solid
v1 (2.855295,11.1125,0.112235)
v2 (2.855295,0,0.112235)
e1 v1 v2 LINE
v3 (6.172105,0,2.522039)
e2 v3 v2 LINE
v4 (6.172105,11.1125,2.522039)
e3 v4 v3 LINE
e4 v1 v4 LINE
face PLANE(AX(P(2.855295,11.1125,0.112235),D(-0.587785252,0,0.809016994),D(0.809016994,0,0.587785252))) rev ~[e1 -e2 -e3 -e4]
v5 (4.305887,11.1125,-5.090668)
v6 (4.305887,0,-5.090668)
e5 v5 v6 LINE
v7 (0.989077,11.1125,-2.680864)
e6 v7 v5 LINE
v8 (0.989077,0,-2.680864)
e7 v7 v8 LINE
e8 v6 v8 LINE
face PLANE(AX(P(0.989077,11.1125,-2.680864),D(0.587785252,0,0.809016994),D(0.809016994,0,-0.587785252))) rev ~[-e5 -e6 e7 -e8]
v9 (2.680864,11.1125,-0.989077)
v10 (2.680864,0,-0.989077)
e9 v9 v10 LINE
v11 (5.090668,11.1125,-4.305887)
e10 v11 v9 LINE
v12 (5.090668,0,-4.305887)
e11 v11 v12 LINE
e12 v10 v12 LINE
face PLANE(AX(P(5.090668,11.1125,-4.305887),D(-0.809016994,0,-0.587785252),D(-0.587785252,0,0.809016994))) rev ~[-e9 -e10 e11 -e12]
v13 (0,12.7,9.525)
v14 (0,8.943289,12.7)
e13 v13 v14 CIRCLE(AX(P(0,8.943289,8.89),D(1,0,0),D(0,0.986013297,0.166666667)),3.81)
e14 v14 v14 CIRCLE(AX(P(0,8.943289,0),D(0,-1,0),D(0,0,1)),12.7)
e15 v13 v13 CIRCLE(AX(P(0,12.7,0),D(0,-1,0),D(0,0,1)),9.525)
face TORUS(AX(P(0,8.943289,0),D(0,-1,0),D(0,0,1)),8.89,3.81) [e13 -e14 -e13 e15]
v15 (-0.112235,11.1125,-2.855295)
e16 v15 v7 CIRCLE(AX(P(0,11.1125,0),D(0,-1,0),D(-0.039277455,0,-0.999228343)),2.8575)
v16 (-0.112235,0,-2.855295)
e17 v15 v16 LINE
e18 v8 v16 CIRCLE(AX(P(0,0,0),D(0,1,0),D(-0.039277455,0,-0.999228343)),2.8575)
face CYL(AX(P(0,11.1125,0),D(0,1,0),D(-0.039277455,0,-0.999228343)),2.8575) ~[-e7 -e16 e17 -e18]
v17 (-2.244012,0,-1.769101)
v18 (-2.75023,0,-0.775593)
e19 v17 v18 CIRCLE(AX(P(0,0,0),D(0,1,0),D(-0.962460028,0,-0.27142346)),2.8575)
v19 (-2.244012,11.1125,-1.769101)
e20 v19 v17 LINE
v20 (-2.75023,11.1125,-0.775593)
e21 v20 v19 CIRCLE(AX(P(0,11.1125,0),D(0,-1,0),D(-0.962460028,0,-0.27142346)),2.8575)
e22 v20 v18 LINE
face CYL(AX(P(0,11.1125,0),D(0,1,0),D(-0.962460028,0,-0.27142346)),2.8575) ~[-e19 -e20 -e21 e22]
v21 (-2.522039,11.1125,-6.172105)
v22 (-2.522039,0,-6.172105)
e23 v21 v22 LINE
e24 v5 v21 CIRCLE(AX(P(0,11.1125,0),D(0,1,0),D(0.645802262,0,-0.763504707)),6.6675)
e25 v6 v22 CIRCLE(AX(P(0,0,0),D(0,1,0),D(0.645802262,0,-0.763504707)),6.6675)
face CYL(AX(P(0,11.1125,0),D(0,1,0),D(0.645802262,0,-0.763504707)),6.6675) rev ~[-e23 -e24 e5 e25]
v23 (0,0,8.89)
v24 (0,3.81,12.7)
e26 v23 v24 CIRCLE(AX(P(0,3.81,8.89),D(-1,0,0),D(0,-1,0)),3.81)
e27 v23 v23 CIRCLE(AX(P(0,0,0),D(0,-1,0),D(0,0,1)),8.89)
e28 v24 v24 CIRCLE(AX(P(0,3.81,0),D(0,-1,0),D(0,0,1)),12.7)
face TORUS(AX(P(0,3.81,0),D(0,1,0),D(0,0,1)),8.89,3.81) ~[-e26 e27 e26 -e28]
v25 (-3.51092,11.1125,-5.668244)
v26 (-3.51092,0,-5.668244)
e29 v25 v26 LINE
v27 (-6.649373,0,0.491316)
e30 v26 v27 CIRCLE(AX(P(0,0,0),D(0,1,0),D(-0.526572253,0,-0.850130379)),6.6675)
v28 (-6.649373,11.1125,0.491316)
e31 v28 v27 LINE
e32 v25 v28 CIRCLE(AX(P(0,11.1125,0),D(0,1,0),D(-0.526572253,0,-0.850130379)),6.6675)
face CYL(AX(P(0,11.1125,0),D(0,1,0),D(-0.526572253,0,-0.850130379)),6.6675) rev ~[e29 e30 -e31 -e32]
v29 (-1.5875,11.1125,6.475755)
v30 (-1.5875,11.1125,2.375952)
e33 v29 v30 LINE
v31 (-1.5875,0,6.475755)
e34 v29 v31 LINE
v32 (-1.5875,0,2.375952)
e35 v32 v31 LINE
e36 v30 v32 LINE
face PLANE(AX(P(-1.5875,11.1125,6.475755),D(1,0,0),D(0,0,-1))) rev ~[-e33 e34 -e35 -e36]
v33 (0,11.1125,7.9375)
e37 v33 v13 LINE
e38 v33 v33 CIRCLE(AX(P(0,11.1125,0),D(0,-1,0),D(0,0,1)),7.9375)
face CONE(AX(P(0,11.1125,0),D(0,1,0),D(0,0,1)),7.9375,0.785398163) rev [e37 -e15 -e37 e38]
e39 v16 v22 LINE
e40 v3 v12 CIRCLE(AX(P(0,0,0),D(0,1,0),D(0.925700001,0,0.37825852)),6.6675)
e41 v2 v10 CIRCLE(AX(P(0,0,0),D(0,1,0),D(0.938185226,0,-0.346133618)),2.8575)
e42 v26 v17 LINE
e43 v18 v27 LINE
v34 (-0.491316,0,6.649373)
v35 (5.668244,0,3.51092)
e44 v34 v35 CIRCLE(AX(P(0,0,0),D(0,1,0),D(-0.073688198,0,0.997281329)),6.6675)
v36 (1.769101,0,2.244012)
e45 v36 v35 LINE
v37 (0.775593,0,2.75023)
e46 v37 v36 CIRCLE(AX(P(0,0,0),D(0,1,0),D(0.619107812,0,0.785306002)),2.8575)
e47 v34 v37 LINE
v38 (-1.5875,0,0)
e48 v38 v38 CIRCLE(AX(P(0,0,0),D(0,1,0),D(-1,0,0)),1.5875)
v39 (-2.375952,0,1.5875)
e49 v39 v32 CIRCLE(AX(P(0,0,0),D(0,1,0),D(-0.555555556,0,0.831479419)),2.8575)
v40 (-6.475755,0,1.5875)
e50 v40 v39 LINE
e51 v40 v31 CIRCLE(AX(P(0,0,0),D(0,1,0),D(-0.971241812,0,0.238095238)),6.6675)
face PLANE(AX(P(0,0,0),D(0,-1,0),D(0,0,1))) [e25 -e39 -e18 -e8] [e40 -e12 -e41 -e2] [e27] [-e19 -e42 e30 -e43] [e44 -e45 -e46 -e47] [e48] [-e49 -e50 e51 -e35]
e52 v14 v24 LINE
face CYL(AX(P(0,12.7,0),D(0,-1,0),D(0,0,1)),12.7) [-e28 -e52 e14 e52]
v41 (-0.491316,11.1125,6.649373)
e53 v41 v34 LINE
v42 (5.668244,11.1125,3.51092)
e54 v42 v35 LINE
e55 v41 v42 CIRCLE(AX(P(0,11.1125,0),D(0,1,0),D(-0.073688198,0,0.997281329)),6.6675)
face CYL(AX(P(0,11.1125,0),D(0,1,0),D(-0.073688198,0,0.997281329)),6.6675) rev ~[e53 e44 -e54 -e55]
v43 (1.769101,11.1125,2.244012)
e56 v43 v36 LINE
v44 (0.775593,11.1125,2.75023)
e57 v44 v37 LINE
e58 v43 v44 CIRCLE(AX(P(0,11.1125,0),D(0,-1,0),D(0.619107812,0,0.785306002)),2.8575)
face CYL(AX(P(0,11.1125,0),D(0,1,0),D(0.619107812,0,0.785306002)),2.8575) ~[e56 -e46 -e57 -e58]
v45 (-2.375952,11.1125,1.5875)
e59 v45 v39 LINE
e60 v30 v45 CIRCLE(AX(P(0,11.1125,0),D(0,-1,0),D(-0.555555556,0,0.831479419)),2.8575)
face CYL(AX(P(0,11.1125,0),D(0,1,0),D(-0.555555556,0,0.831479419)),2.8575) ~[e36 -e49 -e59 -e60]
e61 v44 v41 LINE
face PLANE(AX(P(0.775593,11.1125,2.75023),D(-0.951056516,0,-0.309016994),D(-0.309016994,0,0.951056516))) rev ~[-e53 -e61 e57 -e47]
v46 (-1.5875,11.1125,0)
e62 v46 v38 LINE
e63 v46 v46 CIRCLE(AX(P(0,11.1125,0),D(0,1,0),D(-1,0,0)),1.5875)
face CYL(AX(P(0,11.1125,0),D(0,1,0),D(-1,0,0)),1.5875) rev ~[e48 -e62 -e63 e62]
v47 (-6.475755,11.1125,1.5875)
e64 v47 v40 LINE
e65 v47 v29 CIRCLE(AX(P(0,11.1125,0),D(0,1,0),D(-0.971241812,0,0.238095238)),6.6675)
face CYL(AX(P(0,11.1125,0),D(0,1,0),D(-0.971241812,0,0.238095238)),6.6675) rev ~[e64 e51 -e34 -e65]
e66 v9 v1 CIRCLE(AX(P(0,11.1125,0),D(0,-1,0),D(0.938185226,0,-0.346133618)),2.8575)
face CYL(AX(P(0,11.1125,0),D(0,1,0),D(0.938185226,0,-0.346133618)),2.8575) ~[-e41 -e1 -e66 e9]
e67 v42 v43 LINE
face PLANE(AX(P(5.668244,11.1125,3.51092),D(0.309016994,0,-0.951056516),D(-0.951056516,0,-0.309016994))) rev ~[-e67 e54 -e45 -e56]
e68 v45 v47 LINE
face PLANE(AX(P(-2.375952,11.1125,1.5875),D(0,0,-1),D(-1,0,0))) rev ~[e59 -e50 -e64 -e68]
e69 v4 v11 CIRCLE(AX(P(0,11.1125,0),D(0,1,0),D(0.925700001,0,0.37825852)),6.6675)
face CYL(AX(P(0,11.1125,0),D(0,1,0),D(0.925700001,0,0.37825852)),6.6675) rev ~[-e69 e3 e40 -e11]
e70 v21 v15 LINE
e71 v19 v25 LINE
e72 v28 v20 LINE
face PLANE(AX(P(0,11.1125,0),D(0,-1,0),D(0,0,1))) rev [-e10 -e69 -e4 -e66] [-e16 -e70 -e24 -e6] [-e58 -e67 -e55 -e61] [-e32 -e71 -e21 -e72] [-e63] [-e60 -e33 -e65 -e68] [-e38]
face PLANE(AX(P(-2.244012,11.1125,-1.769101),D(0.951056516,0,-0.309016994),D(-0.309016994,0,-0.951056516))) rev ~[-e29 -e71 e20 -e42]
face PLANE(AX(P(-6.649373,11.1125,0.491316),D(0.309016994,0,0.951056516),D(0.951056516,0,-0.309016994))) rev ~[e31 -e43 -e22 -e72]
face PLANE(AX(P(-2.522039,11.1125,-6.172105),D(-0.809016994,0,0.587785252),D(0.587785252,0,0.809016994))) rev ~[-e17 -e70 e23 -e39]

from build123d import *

# Parameters (mm, degrees)
F3_R     = 1.5875
F4_DEPTH = 12.7
F6_DEPTH = 25.4


# Not quite as in the source:
# - a fillet or chamfer that OpenCascade refuses, or shapes differently, is made with other operations: its cross-section is extruded or revolved along the edge and cut away or added


with BuildPart() as f1:
    # F0 (on Right) → F1 (revolve)
    with BuildSketch(Plane.YZ):
        Polygon((0, 12.7), (0, 0), (11.1125, 0), (11.1125, 7.9375), (12.7, 9.525), (12.7, 12.7), align=None)
    revolve(axis=Axis((0, 5.55625, 0), (0, -1, 0)))

    # F2: fillet of radius 3.81 on 2 edges, made by hand

    # F2_s1 → F2_t2 (revolve, cut)
    with BuildSketch(Plane.YZ):
        with BuildLine():
            ThreePointArc((0, 8.89), (1.1159231637, 11.5840768363), (3.81, 12.7))
            Line((3.81, 12.7), (0, 12.7))
            Line((0, 12.7), (0, 8.89))
        make_face()
    revolve(axis=Axis((0, 0, 0), (0, -1, 0)), mode=Mode.SUBTRACT)

    # F2_s3 → F2_t4 (revolve, cut)
    with BuildSketch(Plane.YZ):
        with BuildLine():
            ThreePointArc((12.7, 9.525), (11.4026337626, 11.7999355663), (8.9432893377, 12.7))
            Line((8.9432893377, 12.7), (12.7, 12.7))
            Line((12.7, 12.7), (12.7, 9.525))
        make_face()
    revolve(axis=Axis((0, 12.7, 0), (0, -1, 0)), mode=Mode.SUBTRACT)

    # F3 (on face) → F4 (cut)
    with BuildSketch(Plane(origin=(0, 11.1125, 0), x_dir=(-1, 0, 0), z_dir=(0, 1, 0))):
        Circle(F3_R)
    extrude(amount=-F4_DEPTH, mode=Mode.SUBTRACT)

    # F5 (on face) → F6 (cut)
    with BuildSketch(Plane(origin=(0, 11.1125, 0), x_dir=(-1, 0, 0), z_dir=(0, 1, 0))):
        with BuildLine():
            Line((-5.668244305, 3.5109204987), (-1.7691005725, 2.2440119016))
            ThreePointArc((-1.7691005725, 2.2440119016), (-1.297277853, 2.5460511429), (-0.7755925376, 2.7502295296))
            Line((-0.7755925376, 2.7502295296), (0.4913160595, 6.6493732622))
            ThreePointArc((0.4913160595, 6.6493732622), (-3.026981657, 5.940786), (-5.668244305, 3.5109204987))
        make_face()
        with BuildLine():
            ThreePointArc((1.5875, 2.3759524406), (2.0205576272, 2.0205576272), (2.3759524406, 1.5875))
            Line((2.3759524406, 1.5875), (6.4757547823, 1.5875))
            ThreePointArc((6.4757547823, 1.5875), (4.7146344636, 4.7146344636), (1.5875, 6.4757547823))
            Line((1.5875, 6.4757547823), (1.5875, 2.3759524406))
        make_face()
        with BuildLine():
            Line((-5.090667637, -4.3058865822), (-2.6808642833, -0.9890768143))
            ThreePointArc((-2.6808642833, -0.9890768143), (-2.8223194333, -0.4470114839), (-2.8552949903, 0.1122353262))
            Line((-2.8552949903, 0.1122353262), (-6.1721047583, 2.5220386799))
            ThreePointArc((-6.1721047583, 2.5220386799), (-6.5854120109, -1.0430267957), (-5.090667637, -4.3058865822))
        make_face()
        with BuildLine():
            Line((2.5220386799, -6.1721047583), (0.1122353262, -2.8552949903))
            ThreePointArc((0.1122353262, -2.8552949903), (-0.4470114839, -2.8223194333), (-0.9890768143, -2.6808642833))
            Line((-0.9890768143, -2.6808642833), (-4.3058865822, -5.090667637))
            ThreePointArc((-4.3058865822, -5.090667637), (-1.0430267957, -6.5854120109), (2.5220386799, -6.1721047583))
        make_face()
        with BuildLine():
            Line((6.6493732622, 0.4913160595), (2.7502295296, -0.7755925376))
            ThreePointArc((2.7502295296, -0.7755925376), (2.5460511429, -1.297277853), (2.2440119016, -1.7691005725))
            Line((2.2440119016, -1.7691005725), (3.5109204987, -5.668244305))
            ThreePointArc((3.5109204987, -5.668244305), (5.940786, -3.026981657), (6.6493732622, 0.4913160595))
        make_face()
    extrude(amount=-F6_DEPTH, mode=Mode.SUBTRACT)


solid = f1.part
